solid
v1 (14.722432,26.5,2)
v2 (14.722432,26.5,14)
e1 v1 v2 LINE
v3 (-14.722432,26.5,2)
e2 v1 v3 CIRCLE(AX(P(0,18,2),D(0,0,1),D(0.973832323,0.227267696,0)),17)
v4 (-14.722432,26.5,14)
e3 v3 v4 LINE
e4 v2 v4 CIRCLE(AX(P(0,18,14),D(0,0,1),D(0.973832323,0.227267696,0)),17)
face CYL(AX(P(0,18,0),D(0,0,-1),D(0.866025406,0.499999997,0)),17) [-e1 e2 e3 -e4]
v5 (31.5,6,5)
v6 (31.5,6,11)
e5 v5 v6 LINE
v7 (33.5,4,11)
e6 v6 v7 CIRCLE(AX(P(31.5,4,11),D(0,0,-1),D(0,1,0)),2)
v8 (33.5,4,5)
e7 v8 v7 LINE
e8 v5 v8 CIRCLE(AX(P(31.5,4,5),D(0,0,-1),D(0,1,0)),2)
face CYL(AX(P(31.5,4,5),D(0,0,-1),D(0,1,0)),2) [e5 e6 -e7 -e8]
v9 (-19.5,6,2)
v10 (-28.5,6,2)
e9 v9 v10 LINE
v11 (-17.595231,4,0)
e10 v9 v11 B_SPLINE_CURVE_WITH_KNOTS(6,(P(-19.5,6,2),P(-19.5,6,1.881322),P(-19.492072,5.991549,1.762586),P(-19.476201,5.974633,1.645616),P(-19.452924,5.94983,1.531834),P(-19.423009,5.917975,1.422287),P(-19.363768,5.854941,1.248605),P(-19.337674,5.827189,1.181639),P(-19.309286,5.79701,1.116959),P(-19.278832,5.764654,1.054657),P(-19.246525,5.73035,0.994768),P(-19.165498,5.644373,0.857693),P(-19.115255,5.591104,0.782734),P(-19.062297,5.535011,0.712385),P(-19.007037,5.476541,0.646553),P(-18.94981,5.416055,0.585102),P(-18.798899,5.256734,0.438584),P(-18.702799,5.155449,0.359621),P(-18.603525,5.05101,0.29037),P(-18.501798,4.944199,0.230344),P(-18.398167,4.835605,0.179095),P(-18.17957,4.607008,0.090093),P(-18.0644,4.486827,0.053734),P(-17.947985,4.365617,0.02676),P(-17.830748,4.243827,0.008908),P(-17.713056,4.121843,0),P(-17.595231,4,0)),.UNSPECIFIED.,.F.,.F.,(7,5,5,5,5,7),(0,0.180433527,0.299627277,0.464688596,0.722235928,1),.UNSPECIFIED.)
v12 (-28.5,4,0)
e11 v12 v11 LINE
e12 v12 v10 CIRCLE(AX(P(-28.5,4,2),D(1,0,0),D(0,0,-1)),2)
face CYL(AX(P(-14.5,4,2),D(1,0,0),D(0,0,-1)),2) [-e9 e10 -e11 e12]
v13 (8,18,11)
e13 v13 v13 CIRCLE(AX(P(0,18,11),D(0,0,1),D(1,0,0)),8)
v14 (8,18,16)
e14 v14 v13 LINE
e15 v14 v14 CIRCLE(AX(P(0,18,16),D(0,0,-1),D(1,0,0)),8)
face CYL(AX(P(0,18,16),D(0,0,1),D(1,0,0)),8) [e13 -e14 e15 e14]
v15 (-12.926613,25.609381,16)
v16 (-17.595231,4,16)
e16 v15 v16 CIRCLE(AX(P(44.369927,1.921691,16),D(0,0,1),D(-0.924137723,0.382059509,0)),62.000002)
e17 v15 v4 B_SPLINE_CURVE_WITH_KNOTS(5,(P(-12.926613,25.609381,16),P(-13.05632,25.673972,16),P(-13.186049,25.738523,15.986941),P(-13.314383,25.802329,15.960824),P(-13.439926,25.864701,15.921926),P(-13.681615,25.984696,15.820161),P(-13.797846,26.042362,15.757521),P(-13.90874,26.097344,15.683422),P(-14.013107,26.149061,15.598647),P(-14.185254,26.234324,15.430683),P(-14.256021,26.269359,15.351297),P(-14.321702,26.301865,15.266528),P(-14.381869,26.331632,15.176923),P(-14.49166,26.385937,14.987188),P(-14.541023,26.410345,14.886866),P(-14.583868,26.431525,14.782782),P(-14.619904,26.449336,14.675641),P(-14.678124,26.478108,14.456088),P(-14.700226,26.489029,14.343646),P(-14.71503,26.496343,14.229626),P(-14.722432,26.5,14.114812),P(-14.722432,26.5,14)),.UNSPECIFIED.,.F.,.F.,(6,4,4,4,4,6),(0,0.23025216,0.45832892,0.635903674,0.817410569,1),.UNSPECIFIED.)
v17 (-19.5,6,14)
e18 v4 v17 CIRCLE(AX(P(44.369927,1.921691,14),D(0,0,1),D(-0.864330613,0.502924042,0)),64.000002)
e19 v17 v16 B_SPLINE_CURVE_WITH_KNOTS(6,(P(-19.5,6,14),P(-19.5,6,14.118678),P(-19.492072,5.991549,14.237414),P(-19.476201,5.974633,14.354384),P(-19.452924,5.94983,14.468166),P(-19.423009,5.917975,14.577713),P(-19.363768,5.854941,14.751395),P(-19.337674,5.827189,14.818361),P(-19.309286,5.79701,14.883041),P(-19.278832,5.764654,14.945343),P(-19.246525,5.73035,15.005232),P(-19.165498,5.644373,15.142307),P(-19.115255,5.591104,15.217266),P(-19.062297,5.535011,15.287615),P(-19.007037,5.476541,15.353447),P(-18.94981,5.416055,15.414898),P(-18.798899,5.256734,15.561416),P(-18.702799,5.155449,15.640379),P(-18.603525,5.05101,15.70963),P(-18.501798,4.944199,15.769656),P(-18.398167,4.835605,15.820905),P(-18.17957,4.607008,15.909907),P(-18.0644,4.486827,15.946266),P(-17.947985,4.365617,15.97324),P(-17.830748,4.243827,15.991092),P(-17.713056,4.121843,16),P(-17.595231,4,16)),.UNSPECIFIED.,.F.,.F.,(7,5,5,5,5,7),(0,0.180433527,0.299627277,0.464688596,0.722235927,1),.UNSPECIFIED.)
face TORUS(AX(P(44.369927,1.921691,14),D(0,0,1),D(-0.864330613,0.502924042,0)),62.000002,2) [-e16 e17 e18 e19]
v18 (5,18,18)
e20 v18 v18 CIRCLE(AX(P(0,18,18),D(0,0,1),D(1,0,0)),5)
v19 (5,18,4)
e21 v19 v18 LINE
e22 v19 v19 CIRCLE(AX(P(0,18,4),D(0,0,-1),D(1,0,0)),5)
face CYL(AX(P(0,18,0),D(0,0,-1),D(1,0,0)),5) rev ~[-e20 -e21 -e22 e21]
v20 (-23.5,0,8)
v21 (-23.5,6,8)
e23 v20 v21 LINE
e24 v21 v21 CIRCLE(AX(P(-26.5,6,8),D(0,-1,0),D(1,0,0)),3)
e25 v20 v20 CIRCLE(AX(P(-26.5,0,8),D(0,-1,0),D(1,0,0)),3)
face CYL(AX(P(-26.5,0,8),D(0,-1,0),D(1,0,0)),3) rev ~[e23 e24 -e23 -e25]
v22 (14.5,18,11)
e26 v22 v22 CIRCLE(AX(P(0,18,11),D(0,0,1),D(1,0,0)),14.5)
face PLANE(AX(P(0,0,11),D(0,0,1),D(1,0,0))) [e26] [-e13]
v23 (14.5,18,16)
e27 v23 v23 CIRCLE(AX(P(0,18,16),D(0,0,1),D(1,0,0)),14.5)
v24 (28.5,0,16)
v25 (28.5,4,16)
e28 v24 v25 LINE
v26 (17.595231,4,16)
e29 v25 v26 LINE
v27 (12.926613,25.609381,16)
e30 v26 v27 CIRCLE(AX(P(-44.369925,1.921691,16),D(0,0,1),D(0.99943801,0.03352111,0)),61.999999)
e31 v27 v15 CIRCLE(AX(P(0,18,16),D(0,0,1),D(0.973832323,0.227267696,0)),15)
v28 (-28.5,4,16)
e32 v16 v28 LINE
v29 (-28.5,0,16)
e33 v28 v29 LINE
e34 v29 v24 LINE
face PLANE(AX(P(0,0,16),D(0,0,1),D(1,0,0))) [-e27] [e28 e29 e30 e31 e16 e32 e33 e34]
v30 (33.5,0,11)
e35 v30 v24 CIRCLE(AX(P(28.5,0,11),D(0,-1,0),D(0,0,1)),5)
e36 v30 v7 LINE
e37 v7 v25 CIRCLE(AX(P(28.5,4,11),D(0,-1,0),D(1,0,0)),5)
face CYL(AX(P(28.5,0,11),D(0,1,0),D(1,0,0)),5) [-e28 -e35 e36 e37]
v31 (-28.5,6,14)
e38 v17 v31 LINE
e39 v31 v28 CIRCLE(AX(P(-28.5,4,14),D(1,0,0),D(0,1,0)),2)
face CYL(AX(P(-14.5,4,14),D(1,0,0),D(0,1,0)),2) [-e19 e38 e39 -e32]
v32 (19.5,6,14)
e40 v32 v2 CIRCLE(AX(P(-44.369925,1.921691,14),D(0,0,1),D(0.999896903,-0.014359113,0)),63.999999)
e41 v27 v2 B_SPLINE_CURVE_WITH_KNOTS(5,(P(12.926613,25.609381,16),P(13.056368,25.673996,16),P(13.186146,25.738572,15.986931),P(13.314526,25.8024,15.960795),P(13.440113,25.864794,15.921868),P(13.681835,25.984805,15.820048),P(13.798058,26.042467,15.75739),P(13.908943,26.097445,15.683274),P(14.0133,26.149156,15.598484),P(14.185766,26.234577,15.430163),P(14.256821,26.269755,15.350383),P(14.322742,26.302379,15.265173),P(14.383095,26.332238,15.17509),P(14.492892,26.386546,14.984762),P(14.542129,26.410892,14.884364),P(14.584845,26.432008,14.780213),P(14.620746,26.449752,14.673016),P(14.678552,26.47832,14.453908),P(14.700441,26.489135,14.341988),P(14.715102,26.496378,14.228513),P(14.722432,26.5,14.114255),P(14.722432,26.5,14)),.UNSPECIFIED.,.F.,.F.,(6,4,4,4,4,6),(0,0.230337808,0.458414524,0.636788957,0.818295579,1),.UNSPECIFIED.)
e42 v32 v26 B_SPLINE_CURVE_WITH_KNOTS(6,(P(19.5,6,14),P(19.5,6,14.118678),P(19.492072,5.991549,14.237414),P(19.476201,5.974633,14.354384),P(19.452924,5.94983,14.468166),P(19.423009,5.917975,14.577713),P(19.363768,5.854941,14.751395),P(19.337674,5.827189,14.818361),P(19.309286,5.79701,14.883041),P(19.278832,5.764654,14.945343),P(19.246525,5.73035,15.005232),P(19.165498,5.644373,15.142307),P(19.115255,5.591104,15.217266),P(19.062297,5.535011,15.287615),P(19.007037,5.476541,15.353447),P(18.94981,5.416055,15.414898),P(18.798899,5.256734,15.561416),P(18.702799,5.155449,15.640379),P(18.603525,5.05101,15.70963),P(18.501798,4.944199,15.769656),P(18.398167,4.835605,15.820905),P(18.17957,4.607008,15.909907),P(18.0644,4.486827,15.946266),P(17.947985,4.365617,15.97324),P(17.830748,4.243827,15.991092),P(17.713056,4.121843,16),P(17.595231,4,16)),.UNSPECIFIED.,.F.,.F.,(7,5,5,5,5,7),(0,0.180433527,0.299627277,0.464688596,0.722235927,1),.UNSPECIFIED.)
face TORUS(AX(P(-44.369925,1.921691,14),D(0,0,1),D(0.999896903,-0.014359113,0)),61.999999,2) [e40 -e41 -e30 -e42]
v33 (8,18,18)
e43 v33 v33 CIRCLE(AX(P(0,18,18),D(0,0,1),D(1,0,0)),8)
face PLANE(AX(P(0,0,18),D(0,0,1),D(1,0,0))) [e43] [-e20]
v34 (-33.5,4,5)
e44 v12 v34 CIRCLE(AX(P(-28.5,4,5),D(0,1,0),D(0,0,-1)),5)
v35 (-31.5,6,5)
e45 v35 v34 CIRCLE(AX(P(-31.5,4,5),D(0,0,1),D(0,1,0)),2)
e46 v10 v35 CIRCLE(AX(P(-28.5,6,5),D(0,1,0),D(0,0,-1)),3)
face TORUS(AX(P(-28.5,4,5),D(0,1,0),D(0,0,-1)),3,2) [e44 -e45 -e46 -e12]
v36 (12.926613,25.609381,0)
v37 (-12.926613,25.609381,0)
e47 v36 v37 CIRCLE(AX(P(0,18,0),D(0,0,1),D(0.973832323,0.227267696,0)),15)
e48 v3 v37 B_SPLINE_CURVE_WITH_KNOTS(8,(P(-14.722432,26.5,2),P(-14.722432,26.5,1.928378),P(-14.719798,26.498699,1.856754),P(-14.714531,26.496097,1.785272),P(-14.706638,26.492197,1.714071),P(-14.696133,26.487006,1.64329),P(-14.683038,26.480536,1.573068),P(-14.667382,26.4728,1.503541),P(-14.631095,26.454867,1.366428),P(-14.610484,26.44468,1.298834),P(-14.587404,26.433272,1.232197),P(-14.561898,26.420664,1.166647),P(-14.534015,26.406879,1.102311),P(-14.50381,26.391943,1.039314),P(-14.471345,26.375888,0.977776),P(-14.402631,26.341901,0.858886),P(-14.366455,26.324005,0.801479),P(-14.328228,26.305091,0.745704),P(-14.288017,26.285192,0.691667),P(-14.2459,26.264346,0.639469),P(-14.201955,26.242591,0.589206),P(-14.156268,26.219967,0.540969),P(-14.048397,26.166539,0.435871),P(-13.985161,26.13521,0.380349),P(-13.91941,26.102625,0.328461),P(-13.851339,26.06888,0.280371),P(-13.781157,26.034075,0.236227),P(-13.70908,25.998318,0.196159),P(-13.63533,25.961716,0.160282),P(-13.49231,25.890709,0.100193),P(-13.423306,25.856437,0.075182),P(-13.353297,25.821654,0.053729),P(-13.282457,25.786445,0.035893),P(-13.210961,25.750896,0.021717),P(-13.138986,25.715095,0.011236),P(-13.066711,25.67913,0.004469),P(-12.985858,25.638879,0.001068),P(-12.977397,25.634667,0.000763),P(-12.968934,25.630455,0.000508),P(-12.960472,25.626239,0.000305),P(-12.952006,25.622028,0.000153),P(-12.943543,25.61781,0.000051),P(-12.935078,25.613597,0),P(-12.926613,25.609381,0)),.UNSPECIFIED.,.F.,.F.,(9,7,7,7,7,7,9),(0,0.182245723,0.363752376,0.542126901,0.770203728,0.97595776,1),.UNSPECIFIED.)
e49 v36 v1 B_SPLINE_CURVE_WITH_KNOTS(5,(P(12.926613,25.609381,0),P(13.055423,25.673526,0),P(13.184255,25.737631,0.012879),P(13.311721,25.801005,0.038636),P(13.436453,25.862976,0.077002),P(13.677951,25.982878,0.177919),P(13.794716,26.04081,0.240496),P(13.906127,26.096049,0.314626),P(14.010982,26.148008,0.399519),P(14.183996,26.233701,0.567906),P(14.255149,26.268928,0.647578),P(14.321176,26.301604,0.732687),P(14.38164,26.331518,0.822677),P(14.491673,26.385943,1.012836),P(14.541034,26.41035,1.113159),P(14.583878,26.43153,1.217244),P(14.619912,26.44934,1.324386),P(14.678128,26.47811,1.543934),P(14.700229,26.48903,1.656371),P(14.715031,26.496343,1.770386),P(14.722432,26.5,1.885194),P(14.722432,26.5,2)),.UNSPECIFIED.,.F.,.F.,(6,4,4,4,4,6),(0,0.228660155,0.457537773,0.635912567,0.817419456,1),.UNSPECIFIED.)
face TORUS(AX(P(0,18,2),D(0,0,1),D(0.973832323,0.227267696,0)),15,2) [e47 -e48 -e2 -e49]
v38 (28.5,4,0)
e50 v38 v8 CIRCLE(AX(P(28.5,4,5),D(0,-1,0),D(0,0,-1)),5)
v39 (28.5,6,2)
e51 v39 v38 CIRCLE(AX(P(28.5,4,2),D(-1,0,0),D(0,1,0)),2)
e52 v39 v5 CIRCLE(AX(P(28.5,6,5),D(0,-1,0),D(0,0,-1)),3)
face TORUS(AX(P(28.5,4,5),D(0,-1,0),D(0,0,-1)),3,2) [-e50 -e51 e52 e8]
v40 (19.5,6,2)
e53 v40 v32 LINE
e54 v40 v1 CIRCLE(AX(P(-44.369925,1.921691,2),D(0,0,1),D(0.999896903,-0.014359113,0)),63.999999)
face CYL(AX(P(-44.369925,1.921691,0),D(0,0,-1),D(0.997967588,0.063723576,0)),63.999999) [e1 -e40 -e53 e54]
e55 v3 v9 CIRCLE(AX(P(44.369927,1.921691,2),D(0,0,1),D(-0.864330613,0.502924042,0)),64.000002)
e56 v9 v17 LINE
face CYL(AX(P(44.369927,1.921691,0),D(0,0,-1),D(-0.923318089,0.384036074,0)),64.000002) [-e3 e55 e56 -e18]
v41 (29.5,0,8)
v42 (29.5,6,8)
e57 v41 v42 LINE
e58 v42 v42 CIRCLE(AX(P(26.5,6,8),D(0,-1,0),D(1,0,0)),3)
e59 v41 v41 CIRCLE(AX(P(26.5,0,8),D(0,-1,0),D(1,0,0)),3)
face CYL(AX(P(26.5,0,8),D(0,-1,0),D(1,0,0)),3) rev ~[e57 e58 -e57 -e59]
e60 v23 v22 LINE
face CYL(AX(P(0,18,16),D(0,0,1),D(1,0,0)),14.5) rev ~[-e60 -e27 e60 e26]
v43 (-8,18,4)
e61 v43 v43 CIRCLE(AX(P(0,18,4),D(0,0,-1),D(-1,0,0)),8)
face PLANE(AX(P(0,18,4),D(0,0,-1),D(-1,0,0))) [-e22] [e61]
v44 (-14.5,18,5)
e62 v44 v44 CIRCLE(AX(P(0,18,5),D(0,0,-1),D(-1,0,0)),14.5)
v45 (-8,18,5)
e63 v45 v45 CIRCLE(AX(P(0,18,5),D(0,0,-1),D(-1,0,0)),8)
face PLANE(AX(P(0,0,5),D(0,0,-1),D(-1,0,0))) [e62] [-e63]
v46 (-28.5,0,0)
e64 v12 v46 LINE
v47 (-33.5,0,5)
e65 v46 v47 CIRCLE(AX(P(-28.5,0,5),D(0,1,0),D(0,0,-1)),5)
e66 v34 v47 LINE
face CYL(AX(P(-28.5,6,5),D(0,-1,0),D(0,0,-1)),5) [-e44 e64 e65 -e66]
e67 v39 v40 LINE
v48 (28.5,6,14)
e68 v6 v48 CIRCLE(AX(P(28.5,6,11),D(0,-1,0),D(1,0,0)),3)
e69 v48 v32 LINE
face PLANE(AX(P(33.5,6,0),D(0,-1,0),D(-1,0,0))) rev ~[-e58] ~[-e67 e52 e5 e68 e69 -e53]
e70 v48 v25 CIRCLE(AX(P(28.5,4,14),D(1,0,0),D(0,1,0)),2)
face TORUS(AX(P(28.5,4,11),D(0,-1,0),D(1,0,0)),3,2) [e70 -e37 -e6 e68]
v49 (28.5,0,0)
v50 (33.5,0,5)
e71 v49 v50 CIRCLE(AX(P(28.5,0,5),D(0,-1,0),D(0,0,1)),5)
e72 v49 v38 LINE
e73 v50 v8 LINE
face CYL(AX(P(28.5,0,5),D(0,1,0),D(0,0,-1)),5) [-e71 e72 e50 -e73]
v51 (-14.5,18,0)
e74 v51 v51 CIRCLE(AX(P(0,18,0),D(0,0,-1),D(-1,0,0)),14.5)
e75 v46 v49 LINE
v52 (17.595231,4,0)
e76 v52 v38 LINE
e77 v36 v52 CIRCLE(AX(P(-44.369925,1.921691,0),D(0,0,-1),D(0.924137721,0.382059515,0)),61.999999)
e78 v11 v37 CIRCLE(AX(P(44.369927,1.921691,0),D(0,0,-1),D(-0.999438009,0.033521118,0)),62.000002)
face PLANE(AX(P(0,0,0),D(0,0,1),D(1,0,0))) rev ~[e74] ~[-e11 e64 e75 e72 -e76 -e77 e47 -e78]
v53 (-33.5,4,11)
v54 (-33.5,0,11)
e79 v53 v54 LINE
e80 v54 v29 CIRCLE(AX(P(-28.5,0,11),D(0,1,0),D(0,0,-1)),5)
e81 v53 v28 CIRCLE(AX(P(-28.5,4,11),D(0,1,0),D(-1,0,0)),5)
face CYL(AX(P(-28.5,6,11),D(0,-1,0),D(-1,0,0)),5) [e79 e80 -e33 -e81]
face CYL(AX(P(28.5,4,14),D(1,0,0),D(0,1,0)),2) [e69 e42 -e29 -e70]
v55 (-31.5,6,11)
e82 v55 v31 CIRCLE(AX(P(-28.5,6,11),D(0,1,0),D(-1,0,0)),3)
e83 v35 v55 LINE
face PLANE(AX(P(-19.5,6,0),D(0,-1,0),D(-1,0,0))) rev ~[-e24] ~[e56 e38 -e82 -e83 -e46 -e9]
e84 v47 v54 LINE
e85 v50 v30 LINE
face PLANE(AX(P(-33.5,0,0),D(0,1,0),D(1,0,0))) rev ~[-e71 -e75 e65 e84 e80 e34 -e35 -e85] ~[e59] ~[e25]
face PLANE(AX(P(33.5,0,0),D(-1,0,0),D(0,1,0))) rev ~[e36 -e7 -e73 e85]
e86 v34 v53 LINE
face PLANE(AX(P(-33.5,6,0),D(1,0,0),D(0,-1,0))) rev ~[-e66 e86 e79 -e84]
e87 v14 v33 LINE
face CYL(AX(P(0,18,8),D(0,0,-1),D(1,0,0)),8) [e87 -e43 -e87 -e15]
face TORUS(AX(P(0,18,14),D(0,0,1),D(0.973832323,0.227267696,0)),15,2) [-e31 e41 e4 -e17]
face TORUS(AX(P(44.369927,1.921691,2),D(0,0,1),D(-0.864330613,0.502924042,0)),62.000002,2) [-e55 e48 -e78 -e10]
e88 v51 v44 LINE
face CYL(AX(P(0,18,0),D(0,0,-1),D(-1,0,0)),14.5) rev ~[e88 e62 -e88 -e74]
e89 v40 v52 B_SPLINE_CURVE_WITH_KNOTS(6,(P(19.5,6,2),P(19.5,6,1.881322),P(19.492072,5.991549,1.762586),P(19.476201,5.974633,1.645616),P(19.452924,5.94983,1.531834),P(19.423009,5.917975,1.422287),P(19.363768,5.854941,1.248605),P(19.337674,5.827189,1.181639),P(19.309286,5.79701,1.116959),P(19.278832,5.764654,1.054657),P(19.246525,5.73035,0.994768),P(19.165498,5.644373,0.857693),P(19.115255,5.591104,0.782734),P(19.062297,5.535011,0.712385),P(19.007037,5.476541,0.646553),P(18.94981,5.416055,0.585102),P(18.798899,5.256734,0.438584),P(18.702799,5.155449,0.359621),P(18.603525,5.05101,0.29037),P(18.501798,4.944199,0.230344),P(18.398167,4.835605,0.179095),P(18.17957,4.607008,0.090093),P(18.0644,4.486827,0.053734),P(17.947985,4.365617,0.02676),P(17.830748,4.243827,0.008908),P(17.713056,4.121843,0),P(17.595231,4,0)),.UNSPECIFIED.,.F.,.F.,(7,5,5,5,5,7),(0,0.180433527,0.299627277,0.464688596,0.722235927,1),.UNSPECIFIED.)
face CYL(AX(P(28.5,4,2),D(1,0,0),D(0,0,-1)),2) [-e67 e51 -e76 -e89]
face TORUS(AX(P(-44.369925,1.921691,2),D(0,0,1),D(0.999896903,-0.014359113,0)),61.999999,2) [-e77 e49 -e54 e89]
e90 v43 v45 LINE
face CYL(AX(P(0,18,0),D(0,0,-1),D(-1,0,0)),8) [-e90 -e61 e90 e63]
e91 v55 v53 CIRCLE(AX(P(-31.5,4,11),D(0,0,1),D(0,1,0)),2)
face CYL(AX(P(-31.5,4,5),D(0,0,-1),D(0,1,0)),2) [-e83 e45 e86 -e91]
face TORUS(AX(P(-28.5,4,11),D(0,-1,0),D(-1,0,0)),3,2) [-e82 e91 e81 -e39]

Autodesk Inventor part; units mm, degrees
ref_plane "YZ Plane" through (0, 0, 0) normal (1, 0, 0) x (0, 1, 0)
ref_plane "XZ Plane" through (0, 0, 0) normal (0, 1, 0) x (-1, 0, 0)
sketch "Szkic1" plane through (0, 0, 0) normal (0, 0, 1) x (1, 0, 0)
  line L0 (0, 0) -> (33.5, 0)
  line L1 (0, 0) -> (-33.5, 0)
  circle A0 centre (0, 18) radius 5
  line L2 (-33.5, 0) -> (-33.5, 6)
  line L3 (33.5, 6) -> (33.5, 0)
  line L4 (-19.5, 6) -> (-26.5, 6)
  line L5 (19.5, 6) -> (26.5, 6)
  line L6 (-26.5, 6) -> (-19.5, 6)
  line L7 (26.5, 6) -> (19.5, 6)
  line L8 (0, 18) -> (-14.722432, 26.5) construction
  line L9 (0, 18) -> (0, 35) construction
  line L10 (0, 18) -> (14.722432, 26.5) construction
  line L11 (0, 18) -> (0, 35) construction
  arc A1 (19.5, 6) -> (14.722432, 26.5) centre (-44.369926, 1.921691) ccw
  line L12 (-33.5, 6) -> (-19.5, 6)
  line L13 (19.5, 6) -> (33.5, 6)
  arc A2 (-14.722432, 26.5) -> (-19.5, 6) centre (44.369926, 1.921691) ccw
  line L14 (-19.5, 6) -> (19.5, 6)
  line L15 (-14.722432, 26.5) -> (-14.722432, 6)
  line L16 (14.722432, 26.5) -> (14.722432, 6)
  arc A3 (0, 35) -> (-14.722432, 26.5) centre (0, 18) ccw
  arc A4 (14.722432, 26.5) -> (0, 35) centre (0, 18) ccw
  dimension "d0" = 33.5
  dimension "d1" = 33.5
  dimension "d2" = 35
  dimension "d4" = 10
  dimension "d5" = 6
  dimension "d9" = 7
  dimension "d10" = 7
  dimension "d11" = 60
  dimension "d12" = 60
  dimension "d14" = 64
  dimension "d15" = 64
sketch "Szkic1 outline for Wyciągnięcie proste1" plane through (0, 0, 0) normal (0, 0, 1) x (1, 0, 0)
  arc A0 (19.5, 6) -> (14.722432, 26.5) centre (-44.369926, 1.921691) ccw
  arc A1 (14.722432, 26.5) -> (-14.722432, 26.5) centre (0, 18) ccw
  arc A2 (-14.722432, 26.5) -> (-19.5, 6) centre (44.369926, 1.921691) ccw
  line L0 (-19.5, 6) -> (-33.5, 6)
  line L1 (-33.5, 6) -> (-33.5, 0)
  line L2 (-33.5, 0) -> (33.5, 0)
  line L3 (33.5, 0) -> (33.5, 6)
  line L4 (33.5, 6) -> (19.5, 6)
  circle A3 centre (0, 18) radius 5
extrude "Wyciągnięcie proste1" add sketch "Szkic1 outline for Wyciągnięcie proste1" along normal blind 16
sketch "Szkic2" plane through (-33.5, 0, 0) normal (0, -1, 0) x (1, 0, 0)
  circle A0 centre (7, 8) radius 3
  circle A1 centre (60, 8) radius 3
sketch "Szkic2 outline for Wyciągnięcie proste2" plane through (-33.5, 0, 0) normal (0, -1, 0) x (1, 0, 0)
  circle A0 centre (7, 8) radius 3
  circle A1 centre (60, 8) radius 3
extrude "Wyciągnięcie proste2" cut sketch "Szkic2 outline for Wyciągnięcie proste2" against normal up to next
ref_plane "Płaszczyzna konstrukcyjna1" through (0, 0, 8) normal (0, 0, 1) x (1, 0, 0)
sketch "Szkic3" plane through (0, 0, 8) normal (0, 0, 1) x (1, 0, 0)
  circle A0 centre (0, 18) radius 5 projected
  circle A1 centre (0, 18) radius 8
  point P0 (0, 0)
  dimension "d28" = 16
sketch "Szkic3 outline for Wyciągnięcie proste3" plane through (0, 0, 8) normal (0, 0, 1) x (1, 0, 0)
  circle A0 centre (0, 18) radius 8
  circle A1 centre (0, 18) radius 5
extrude "Wyciągnięcie proste3" add sketch "Szkic3 outline for Wyciągnięcie proste3" along normal blind 10
sketch "Szkic4" plane through (0, 0, 16) normal (0, 0, 1) x (1, 0, 0)
  arc A0 (-14.722432, 26.5) -> (-19.5, 6) centre (44.369926, 1.921691) ccw
  arc A1 (14.722432, 26.5) -> (-14.722432, 26.5) centre (0, 18) ccw
  arc A2 (19.5, 6) -> (14.722432, 26.5) centre (-44.369926, 1.921691) ccw
  arc A3 (-16.750014, 20.904656) -> (16.750014, 20.904656) centre (0, 18) ccw
  circle A4 centre (0, 18) radius 14.5
  circle A5 centre (0, 18) radius 8
  point P0 (0, 0)
  dimension "d31" = 29
sketch "Szkic4 outline for Wyciągnięcie proste4" plane through (0, 0, 16) normal (0, 0, 1) x (1, 0, 0)
  circle A0 centre (0, 18) radius 14.5
  circle A1 centre (0, 18) radius 8
extrude "Wyciągnięcie proste4" cut sketch "Szkic4 outline for Wyciągnięcie proste4" against normal blind 5
sketch "Szkic5" plane through (0, 0, 0) normal (0, 0, -1) x (-1, 0, 0)
  circle A0 centre (0, 18) radius 5
  circle A1 centre (0, 18) radius 8
  arc A2 (14.722432, 26.5) -> (-14.722432, 26.5) centre (0, 18) ccw
  arc A3 (19.5, 6) -> (14.722432, 26.5) centre (-44.369926, 1.921691) ccw
  arc A4 (-14.722432, 26.5) -> (-19.5, 6) centre (44.369926, 1.921691) ccw
  arc A5 (-14.722432, 26.5) -> (-19.5, 6) centre (44.369926, 1.921691) ccw
  arc A6 (19.5, 6) -> (14.722432, 26.5) centre (-44.369926, 1.921691) ccw
  arc A7 (-16.750014, 20.904656) -> (16.750014, 20.904656) centre (0, 18) ccw
  circle A8 centre (0, 18) radius 14.5
  point P0 (0, 0)
  dimension "d34" = 16
  dimension "d35" = 29
sketch "Szkic5 outline for Wyciągnięcie proste5" plane through (0, 0, 0) normal (0, 0, -1) x (-1, 0, 0)
  circle A0 centre (0, 18) radius 14.5
  circle A1 centre (0, 18) radius 8
extrude "Wyciągnięcie proste5" cut sketch "Szkic5 outline for Wyciągnięcie proste5" against normal blind 5
sketch "Szkic6" plane through (0, 18, 0) normal (0, 0, -1) x (-1, 0, 0)
  circle A0 centre (0, 0) radius 8 projected
  circle A1 centre (0, 0) radius 5 projected
  point P0 (0, -18)
sketch "Szkic6 outline for Wyciągnięcie proste6" plane through (0, 18, 0) normal (0, 0, -1) x (-1, 0, 0)
  circle A0 centre (0, 0) radius 8
  circle A1 centre (0, 0) radius 5
extrude "Wyciągnięcie proste6" cut sketch "Szkic6 outline for Wyciągnięcie proste6" against normal blind 4
fillet "Zaokrąglenie1" radius 5 4 edges at (-33.5, 3, 16) (-33.5, 3, 0) (33.5, 3, 16) (33.5, 3, 0)
fillet "Zaokrąglenie2" radius 2 14 edges at (17.9598, 16.4478, 16) (0, 35, 16) (-17.9598, 16.4478, 16) (32.0355, 6, 14.5355) (33.5, 6, 8) (32.0355, 6, 1.4645) (-24, 6, 0) (24, 6, 16) (-32.0355, 6, 14.5355) (-33.5, 6, 8) (-32.0355, 6, 1.4645) (0, 35, 0) (-17.9598, 16.4478, 0) (17.9598, 16.4478, 0)
properties part number "Łożysko w obudowie aluminiowej 10mm KP000"
